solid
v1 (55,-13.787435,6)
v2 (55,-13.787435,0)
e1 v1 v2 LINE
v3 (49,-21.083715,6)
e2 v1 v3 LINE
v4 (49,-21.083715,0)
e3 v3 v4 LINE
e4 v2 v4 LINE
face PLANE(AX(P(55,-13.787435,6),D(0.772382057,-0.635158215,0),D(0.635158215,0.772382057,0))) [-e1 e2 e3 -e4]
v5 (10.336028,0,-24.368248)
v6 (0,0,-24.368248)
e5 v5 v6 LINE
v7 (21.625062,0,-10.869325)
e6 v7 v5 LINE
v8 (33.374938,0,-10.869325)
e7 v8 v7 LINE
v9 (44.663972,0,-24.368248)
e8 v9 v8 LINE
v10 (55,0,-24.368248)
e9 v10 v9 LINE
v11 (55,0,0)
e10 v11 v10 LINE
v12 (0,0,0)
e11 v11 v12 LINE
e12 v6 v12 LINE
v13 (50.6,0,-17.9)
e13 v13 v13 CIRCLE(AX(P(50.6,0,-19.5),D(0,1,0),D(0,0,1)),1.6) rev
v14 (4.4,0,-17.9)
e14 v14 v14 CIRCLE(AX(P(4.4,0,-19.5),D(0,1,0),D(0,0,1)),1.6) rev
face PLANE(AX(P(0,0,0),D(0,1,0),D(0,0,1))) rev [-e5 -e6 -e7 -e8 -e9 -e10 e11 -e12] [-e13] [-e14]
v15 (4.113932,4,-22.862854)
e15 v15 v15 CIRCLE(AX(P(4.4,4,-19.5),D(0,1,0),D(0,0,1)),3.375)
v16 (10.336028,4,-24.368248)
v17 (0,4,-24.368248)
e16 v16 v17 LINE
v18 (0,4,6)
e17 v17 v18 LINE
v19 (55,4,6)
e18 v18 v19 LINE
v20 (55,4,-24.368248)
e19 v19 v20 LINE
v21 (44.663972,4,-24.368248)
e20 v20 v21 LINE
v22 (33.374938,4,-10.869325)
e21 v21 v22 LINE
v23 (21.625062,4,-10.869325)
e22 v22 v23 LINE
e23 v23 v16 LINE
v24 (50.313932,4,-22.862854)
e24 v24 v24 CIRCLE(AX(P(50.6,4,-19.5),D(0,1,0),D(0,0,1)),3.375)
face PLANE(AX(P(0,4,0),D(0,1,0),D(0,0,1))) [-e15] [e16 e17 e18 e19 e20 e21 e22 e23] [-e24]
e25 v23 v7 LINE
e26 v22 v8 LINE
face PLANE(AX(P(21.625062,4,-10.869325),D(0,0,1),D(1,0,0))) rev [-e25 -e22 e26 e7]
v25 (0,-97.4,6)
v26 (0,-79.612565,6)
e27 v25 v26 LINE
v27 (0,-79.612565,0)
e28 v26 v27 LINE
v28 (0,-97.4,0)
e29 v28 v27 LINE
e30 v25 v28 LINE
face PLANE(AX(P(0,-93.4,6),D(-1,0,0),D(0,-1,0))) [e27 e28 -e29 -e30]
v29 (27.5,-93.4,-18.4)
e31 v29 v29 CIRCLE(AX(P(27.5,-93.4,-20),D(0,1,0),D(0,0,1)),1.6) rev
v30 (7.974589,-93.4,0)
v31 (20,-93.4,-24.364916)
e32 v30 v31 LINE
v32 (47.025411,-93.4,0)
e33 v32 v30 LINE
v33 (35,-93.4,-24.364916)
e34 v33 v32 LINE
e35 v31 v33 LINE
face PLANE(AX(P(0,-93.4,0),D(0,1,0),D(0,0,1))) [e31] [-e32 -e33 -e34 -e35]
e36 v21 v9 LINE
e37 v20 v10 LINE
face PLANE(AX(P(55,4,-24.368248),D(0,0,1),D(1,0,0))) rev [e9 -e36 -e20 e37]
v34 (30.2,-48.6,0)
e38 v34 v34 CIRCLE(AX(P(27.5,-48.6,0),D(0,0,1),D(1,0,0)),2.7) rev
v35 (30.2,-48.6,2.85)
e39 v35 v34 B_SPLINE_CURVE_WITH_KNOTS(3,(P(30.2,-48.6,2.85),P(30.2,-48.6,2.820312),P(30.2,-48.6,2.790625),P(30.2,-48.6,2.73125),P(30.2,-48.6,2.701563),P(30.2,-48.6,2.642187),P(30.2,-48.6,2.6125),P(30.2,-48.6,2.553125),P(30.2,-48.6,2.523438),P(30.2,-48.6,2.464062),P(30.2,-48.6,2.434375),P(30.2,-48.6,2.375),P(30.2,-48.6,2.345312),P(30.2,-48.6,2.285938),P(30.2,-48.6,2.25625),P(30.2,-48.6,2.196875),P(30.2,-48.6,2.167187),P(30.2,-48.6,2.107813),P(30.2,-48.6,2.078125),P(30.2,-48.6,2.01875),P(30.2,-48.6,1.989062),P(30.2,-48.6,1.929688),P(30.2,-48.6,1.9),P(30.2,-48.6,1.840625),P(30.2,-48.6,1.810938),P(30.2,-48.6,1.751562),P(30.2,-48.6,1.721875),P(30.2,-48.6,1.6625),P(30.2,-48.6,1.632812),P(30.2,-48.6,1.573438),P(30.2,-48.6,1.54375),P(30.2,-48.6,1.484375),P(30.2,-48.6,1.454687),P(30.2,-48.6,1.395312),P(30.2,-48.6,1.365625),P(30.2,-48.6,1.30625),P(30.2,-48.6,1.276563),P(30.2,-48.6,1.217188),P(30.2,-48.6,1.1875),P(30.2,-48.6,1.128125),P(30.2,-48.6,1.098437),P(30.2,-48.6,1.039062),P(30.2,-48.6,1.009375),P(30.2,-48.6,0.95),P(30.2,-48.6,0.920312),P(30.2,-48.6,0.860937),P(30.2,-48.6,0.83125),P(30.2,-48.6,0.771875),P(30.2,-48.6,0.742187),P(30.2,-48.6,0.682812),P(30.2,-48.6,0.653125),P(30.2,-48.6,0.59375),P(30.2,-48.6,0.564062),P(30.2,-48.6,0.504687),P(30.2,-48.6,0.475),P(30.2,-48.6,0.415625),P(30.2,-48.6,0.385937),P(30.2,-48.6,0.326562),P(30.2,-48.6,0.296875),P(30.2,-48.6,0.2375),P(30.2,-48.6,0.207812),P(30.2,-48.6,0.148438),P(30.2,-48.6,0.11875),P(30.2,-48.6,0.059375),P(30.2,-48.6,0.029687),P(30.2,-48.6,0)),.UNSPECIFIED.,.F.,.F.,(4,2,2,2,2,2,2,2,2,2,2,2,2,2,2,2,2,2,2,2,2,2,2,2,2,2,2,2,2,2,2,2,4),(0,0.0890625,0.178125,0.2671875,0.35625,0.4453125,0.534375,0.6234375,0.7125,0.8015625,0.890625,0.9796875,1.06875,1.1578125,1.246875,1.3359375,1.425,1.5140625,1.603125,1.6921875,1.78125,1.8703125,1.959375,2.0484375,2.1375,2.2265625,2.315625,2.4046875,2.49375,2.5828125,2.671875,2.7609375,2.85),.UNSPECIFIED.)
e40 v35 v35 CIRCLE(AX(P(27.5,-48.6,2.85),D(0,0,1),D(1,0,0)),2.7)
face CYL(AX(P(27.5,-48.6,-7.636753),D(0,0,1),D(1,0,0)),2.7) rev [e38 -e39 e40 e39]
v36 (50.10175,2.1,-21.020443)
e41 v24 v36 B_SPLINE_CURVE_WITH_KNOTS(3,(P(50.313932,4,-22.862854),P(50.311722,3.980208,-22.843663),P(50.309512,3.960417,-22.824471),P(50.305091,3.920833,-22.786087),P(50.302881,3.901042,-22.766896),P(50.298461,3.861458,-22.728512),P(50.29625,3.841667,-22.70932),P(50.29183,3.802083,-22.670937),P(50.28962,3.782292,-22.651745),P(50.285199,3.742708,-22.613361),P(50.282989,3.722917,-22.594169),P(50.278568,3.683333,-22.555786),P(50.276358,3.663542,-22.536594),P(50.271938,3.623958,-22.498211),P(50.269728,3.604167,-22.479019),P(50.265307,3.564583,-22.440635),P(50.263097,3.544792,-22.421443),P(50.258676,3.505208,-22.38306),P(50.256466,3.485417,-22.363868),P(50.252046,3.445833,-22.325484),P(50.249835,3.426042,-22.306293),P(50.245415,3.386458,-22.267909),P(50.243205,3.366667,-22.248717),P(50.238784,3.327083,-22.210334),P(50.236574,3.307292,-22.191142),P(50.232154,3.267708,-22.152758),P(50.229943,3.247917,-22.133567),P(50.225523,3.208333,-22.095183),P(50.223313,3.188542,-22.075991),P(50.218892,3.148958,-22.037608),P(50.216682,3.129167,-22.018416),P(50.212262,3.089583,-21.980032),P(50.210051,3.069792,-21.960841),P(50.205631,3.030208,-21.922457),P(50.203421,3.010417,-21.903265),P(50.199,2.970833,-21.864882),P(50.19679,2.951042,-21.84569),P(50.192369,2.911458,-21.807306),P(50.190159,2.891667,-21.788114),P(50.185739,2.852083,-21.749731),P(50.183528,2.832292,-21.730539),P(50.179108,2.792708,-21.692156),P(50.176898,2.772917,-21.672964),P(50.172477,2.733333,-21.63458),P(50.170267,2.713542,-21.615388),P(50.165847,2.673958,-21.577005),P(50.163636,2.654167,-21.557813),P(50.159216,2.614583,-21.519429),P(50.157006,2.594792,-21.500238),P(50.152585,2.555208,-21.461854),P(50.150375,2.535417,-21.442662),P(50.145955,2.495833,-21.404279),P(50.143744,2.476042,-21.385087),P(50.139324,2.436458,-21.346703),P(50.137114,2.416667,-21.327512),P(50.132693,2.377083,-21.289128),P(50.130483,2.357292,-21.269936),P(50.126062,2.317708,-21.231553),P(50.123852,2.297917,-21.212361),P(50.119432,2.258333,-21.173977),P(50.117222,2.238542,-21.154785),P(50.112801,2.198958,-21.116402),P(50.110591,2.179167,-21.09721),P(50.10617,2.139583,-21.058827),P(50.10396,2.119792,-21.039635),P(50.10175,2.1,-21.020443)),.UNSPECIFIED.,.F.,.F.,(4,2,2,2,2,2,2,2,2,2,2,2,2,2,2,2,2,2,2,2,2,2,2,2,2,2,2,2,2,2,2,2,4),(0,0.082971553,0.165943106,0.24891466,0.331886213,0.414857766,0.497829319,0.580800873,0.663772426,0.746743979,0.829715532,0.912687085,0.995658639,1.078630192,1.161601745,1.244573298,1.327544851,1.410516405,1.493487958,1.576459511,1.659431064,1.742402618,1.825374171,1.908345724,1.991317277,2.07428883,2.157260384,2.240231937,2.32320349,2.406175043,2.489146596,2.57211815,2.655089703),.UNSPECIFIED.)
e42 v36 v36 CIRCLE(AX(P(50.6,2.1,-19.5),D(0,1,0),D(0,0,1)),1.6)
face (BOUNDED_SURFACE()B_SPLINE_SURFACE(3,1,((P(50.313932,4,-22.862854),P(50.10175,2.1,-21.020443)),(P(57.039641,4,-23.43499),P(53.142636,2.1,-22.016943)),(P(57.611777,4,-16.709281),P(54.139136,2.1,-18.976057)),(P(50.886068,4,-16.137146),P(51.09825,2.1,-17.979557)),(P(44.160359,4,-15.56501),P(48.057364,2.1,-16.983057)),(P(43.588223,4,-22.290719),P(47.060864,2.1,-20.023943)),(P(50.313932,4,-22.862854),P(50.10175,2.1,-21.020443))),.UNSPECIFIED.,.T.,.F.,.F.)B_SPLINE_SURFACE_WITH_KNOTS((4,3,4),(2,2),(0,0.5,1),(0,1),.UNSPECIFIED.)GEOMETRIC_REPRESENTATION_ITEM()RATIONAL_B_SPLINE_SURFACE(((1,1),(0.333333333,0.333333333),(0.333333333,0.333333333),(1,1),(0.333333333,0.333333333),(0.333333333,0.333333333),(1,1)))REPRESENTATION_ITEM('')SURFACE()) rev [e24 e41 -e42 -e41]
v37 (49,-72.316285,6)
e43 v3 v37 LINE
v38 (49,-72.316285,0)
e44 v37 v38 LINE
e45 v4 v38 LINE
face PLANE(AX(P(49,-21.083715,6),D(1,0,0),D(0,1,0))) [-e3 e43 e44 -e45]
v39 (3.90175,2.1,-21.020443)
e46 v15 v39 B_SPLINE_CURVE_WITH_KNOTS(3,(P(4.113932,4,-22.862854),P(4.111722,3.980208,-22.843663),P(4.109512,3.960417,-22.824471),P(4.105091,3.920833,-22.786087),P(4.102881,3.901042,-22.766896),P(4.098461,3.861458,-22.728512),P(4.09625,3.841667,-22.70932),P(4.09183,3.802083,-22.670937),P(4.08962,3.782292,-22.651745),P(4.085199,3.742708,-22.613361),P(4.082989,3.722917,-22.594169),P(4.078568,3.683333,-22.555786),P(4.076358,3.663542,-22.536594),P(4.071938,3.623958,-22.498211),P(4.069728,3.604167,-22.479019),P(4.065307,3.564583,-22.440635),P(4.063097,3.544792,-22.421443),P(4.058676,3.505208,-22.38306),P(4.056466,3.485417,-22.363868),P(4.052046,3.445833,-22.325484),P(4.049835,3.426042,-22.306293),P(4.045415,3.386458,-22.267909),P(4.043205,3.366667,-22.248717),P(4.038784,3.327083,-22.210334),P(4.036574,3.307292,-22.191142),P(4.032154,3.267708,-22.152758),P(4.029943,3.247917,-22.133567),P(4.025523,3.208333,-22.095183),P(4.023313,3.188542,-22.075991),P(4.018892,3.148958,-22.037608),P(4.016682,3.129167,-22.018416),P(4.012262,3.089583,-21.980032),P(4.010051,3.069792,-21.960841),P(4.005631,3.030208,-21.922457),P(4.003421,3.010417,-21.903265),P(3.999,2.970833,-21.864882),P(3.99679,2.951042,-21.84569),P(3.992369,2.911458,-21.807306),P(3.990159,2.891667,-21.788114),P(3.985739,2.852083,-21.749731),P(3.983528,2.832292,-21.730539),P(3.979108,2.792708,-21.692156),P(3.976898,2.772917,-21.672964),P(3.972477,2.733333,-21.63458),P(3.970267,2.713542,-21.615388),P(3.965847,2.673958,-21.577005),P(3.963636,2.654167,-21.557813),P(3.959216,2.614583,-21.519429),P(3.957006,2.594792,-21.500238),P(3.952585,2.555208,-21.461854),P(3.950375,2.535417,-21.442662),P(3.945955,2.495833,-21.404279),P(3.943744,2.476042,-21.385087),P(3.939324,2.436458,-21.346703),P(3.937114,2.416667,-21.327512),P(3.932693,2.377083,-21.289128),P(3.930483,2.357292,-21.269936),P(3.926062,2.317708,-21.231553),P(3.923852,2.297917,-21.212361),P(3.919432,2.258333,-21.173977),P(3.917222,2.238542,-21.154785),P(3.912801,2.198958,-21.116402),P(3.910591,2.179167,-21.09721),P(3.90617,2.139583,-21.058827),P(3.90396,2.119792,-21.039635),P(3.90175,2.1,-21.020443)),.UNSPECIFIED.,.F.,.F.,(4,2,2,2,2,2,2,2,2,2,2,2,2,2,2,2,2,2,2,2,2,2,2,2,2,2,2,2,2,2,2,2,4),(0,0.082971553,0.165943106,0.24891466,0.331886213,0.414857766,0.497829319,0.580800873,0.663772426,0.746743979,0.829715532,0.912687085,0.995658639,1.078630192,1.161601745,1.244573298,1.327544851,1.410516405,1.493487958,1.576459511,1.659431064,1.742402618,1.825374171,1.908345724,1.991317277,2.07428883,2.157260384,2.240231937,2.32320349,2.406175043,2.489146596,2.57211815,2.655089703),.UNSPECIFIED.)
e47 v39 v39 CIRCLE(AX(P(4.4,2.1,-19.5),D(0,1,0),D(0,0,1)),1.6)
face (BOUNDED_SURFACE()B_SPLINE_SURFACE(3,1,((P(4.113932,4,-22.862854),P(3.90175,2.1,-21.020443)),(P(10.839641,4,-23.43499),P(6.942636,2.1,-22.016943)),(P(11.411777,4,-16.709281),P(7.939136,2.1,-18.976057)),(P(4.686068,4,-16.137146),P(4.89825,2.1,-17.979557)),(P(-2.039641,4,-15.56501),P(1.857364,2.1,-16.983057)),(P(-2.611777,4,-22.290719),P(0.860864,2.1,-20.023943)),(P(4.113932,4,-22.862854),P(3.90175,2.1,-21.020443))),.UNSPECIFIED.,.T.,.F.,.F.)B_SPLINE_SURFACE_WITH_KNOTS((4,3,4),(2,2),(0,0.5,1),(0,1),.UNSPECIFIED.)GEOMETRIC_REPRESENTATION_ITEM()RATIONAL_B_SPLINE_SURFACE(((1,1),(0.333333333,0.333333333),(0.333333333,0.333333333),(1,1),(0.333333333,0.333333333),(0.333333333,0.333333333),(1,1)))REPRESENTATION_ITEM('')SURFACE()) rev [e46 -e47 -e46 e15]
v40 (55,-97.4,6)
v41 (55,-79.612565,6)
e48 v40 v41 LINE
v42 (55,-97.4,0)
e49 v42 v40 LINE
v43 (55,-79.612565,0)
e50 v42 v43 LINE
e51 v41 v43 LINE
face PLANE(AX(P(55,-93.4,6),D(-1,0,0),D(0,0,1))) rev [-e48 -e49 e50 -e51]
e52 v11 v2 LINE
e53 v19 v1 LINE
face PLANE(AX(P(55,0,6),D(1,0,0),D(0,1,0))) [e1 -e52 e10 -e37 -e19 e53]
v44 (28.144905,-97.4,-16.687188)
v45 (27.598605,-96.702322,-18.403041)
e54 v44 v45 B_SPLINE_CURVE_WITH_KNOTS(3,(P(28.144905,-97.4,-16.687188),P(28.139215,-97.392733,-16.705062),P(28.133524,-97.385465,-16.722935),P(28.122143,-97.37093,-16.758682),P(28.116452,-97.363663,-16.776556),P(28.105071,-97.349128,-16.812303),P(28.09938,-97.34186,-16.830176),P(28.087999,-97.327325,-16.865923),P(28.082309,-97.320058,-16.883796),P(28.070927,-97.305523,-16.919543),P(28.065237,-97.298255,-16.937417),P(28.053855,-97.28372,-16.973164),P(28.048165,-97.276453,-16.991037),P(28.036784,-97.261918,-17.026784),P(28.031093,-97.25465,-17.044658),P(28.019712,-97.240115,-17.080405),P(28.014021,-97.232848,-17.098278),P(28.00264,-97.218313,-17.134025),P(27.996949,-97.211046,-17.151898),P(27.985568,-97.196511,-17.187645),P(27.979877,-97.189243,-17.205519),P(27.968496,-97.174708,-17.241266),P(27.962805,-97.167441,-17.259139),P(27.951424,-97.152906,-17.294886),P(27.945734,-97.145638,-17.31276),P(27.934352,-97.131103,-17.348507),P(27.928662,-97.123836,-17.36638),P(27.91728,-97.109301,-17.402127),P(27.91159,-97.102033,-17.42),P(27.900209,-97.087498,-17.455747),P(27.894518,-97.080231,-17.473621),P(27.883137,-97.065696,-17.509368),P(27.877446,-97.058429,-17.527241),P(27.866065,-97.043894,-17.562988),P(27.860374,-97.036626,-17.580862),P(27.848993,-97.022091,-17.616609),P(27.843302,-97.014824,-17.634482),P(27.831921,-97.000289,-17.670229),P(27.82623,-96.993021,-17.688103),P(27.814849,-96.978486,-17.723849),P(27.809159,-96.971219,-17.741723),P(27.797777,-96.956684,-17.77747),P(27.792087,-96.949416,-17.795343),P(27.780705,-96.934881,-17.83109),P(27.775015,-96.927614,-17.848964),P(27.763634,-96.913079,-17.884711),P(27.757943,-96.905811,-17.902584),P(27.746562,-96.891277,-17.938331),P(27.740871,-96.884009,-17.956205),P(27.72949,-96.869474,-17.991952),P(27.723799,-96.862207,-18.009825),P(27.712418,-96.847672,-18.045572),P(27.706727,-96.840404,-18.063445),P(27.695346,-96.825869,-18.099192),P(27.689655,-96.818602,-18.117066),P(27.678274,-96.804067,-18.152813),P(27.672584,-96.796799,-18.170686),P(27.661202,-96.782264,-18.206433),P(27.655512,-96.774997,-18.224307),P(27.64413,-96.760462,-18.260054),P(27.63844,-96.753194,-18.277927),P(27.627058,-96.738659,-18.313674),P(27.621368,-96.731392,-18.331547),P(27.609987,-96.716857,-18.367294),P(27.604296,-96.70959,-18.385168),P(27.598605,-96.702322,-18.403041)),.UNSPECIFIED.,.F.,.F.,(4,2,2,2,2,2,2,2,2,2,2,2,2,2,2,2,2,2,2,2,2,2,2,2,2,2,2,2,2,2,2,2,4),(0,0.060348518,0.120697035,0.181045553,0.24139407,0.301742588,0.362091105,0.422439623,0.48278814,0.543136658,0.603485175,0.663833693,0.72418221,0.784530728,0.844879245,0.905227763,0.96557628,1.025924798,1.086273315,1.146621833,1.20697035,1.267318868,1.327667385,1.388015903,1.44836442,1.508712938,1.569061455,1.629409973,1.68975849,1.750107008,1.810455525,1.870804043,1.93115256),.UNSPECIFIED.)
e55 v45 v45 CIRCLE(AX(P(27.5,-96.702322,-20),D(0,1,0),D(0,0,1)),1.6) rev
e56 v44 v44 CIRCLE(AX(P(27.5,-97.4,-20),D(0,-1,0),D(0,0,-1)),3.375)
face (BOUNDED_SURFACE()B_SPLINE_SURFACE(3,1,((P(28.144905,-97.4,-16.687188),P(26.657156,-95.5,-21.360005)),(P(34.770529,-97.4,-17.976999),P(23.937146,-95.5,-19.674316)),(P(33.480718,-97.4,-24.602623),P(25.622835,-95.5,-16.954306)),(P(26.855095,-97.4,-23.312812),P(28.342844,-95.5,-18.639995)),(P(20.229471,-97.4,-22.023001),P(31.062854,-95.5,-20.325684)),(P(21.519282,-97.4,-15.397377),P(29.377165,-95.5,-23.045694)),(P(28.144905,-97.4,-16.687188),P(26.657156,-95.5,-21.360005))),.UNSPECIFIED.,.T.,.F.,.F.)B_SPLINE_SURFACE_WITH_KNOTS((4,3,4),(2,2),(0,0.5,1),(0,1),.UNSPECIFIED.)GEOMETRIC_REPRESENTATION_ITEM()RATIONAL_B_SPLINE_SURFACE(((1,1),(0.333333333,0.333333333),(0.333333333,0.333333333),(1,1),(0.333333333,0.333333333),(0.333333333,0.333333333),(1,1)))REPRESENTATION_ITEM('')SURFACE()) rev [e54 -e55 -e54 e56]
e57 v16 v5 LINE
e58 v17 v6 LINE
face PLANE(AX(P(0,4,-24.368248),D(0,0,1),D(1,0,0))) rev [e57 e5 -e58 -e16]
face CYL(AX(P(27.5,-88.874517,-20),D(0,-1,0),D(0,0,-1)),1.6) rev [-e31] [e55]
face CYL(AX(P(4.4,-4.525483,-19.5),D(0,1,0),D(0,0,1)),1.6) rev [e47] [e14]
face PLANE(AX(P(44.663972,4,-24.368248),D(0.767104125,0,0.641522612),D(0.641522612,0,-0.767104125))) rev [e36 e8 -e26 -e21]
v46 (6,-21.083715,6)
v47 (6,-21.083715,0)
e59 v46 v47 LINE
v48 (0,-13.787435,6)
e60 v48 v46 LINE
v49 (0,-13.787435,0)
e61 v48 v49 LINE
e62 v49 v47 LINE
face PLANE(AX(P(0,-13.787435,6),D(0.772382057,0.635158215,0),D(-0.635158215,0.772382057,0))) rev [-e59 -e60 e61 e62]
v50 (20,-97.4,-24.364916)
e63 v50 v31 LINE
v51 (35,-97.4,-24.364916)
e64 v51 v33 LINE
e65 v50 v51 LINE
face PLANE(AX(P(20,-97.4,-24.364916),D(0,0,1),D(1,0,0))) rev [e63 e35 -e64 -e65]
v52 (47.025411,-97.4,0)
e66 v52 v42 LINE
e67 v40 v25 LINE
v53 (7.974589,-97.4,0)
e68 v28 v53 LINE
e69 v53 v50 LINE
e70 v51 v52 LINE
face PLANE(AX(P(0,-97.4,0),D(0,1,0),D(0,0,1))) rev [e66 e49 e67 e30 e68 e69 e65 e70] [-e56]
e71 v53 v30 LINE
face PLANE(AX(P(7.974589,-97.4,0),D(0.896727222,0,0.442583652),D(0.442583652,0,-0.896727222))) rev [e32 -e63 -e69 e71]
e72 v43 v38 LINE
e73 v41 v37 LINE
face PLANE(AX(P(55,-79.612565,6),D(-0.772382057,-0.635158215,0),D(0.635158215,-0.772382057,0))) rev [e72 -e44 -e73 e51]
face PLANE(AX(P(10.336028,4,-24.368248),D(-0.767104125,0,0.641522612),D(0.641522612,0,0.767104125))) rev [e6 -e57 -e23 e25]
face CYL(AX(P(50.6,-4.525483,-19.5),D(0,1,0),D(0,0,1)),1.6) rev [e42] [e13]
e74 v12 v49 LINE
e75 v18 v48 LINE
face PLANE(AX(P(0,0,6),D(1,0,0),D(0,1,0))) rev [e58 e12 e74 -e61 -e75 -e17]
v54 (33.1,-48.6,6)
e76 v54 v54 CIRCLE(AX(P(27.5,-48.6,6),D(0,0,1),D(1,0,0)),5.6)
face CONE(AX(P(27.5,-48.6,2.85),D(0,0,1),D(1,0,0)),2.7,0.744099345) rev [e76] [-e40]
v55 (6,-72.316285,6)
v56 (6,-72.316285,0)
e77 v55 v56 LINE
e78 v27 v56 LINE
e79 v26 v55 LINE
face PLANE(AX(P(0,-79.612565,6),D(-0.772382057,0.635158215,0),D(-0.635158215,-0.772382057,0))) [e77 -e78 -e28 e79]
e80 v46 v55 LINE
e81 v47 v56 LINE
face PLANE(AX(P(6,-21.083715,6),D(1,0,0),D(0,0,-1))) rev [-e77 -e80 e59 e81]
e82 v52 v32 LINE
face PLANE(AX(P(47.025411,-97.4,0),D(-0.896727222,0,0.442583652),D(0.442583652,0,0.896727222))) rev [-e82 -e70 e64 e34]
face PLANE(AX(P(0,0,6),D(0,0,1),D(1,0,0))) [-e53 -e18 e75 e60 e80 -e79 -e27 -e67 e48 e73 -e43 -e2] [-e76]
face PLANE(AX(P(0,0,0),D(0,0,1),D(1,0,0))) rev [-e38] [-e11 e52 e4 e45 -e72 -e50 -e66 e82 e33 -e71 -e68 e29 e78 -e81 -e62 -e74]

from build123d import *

# Parameters (mm, degrees)
BOSS_EXTRUDE1_DEPTH = 6
BOSS_EXTRUDE2_DEPTH = 4
BOSS_EXTRUDE3_DEPTH = 4
SKETCH4_R           = 2.7
CUT_EXTRUDE1_DEPTH  = 6
SKETCH6_R           = 5.6
SKETCH5_R           = 2.7
SKETCH7_R           = 1.6
CUT_EXTRUDE2_DEPTH  = 4
SKETCH8_R           = 1.6
CUT_EXTRUDE3_DEPTH  = 4
LPATTERN1_COUNT     = 2
LPATTERN1_PITCH     = 46.2


with BuildPart() as part:
    # Sketch1 → Boss-Extrude1 (new body)
    with BuildSketch(Plane.XY):
        Polygon((55, 0), (0, 0), (0, -13.787434686), (6, -21.083714938), (6, -72.316285062), (0, -79.612565314), (0, -93.4), (55, -93.4), (55, -79.612565314), (49, -72.316285062), (49, -21.083714938), (55, -13.787434686), align=None)
    extrude(amount=BOSS_EXTRUDE1_DEPTH)

    # Sketch2 → Boss-Extrude2 (add)
    with BuildSketch(Plane(origin=(0, 0, 0), x_dir=(1, 0, 0), z_dir=(0, 1, 0))):
        Polygon((0, -6), (0, 0), (0, 24.368247755), (10.336028335, 24.368247755), (21.625062203, 10.869324577), (33.374937797, 10.869324577), (44.663971665, 24.368247755), (55, 24.368247755), (55, 0), (55, -6), align=None)
    extrude(amount=BOSS_EXTRUDE2_DEPTH)

    # Sketch3 → Boss-Extrude3 (add)
    with BuildSketch(Plane.XZ.offset(93.4)):
        Polygon((55, 6), (0, 6), (0, 0), (7.974588669, 0), (20, -24.364916427), (35, -24.364916427), (47.025411331, 0), (55, 0), align=None)
    extrude(amount=BOSS_EXTRUDE3_DEPTH)

    # Sketch4 → Cut-Extrude1 (cut)
    with BuildSketch(Plane.XY.offset(6)):
        with Locations((27.5, -48.6)):
            Circle(SKETCH4_R)
    extrude(amount=-CUT_EXTRUDE1_DEPTH, mode=Mode.SUBTRACT)

    # Sketch6 → Cut-Loft1 section 0
    with BuildSketch(Plane.XY.offset(6)):
        with Locations((27.5, -48.6)):
            Circle(SKETCH6_R)
    # Sketch5 → Cut-Loft1 section 1
    with BuildSketch(Plane.XY.offset(2.85)):
        with Locations((27.5, -48.6)):
            Circle(SKETCH5_R)
    loft(mode=Mode.SUBTRACT)

    # Sketch7 → Cut-Extrude2 (cut)
    with BuildSketch(Plane(origin=(0, 4, 0), x_dir=(1, 0, 0), z_dir=(0, 1, 0))):
        with Locations(Location((50.6, 19.5, 0), (0, 0, 270))):
            Circle(SKETCH7_R)
        with Locations(Location((4.4, 19.5, 0), (0, 0, 270))):
            Circle(SKETCH7_R)
    extrude(amount=-CUT_EXTRUDE2_DEPTH, mode=Mode.SUBTRACT)

    # Sketch8 → Cut-Extrude3 (cut)
    with BuildSketch(Plane.XZ.offset(97.4)):
        with Locations(Location((27.5, -20, 0), (0, 0, 270))):
            Circle(SKETCH8_R)
    extrude(amount=-CUT_EXTRUDE3_DEPTH, mode=Mode.SUBTRACT)

    # Cut-Loft2: read off the stored shape, not the designer's step
    # Cut-Loft2: loft between two sections, ruled curve by curve
    cut_loft2_from = [
        Edge.make_bspline([(28.144905496, -97.4, -16.687188218), (34.77052906, -97.4, -17.97699921), (33.480718067, -97.4, -24.602622774), (26.855094504, -97.4, -23.312811782), (20.22947094, -97.4, -22.02300079), (21.519281933, -97.4, -15.397377226), (28.144905496, -97.4, -16.687188218)], [0, 0, 0, 0, 0.5, 0.5, 0.5, 1, 1, 1, 1], 3, [1, 0.333333333, 0.333333333, 1, 0.333333333, 0.333333333, 1]),
    ]
    cut_loft2_to = [
        Edge.make_bspline([(26.657155547, -95.5, -21.360004864), (23.93714582, -95.5, -19.674315958), (25.622834725, -95.5, -16.954306231), (28.342844453, -95.5, -18.639995136), (31.06285418, -95.5, -20.325684042), (29.377165275, -95.5, -23.045693769), (26.657155547, -95.5, -21.360004864)], [0, 0, 0, 0, 0.5, 0.5, 0.5, 1, 1, 1, 1], 3, [1, 0.333333333, 0.333333333, 1, 0.333333333, 0.333333333, 1]),
    ]
    cut_loft2 = Solid(Shell([*[Face.make_surface_from_curves(cut_loft2_from[k], cut_loft2_to[k]) for k in range(1)], Face(Wire(cut_loft2_from)), Face(Wire(cut_loft2_to))]))
    add(cut_loft2, mode=Mode.SUBTRACT)

    # Cut-Loft3: read off the stored shape, not the designer's step
    # Cut-Loft3: loft between two sections, ruled curve by curve
    cut_loft3_from = [
        Edge.make_bspline([(50.313932129, 4, -22.862854468), (57.039641066, 4, -23.434990209), (57.611776807, 4, -16.709281273), (50.886067871, 4, -16.137145532), (44.160358934, 4, -15.565009791), (43.588223193, 4, -22.290718727), (50.313932129, 4, -22.862854468)], [0, 0, 0, 0, 0.5, 0.5, 0.5, 1, 1, 1, 1], 3, [1, 0.333333333, 0.333333333, 1, 0.333333333, 0.333333333, 1]),
    ]
    cut_loft3_to = [
        Edge.make_bspline([(50.101749949, 2.1, -21.02044299), (53.14263593, 2.1, -22.016943092), (54.139136031, 2.1, -18.976057111), (51.098250051, 2.1, -17.97955701), (48.05736407, 2.1, -16.983056908), (47.060863969, 2.1, -20.023942889), (50.101749949, 2.1, -21.02044299)], [0, 0, 0, 0, 0.5, 0.5, 0.5, 1, 1, 1, 1], 3, [1, 0.333333333, 0.333333333, 1, 0.333333333, 0.333333333, 1]),
    ]
    cut_loft3 = Solid(Shell([*[Face.make_surface_from_curves(cut_loft3_from[k], cut_loft3_to[k]) for k in range(1)], Face(Wire(cut_loft3_from)), Face(Wire(cut_loft3_to))]))
    add(cut_loft3, mode=Mode.SUBTRACT)

    # LPattern1: Cut-Loft3 ×2
    with Locations(*[(-i * LPATTERN1_PITCH, 0, 0) for i in range(1, LPATTERN1_COUNT)]):
        add(cut_loft3, mode=Mode.SUBTRACT)


solid = part.part
